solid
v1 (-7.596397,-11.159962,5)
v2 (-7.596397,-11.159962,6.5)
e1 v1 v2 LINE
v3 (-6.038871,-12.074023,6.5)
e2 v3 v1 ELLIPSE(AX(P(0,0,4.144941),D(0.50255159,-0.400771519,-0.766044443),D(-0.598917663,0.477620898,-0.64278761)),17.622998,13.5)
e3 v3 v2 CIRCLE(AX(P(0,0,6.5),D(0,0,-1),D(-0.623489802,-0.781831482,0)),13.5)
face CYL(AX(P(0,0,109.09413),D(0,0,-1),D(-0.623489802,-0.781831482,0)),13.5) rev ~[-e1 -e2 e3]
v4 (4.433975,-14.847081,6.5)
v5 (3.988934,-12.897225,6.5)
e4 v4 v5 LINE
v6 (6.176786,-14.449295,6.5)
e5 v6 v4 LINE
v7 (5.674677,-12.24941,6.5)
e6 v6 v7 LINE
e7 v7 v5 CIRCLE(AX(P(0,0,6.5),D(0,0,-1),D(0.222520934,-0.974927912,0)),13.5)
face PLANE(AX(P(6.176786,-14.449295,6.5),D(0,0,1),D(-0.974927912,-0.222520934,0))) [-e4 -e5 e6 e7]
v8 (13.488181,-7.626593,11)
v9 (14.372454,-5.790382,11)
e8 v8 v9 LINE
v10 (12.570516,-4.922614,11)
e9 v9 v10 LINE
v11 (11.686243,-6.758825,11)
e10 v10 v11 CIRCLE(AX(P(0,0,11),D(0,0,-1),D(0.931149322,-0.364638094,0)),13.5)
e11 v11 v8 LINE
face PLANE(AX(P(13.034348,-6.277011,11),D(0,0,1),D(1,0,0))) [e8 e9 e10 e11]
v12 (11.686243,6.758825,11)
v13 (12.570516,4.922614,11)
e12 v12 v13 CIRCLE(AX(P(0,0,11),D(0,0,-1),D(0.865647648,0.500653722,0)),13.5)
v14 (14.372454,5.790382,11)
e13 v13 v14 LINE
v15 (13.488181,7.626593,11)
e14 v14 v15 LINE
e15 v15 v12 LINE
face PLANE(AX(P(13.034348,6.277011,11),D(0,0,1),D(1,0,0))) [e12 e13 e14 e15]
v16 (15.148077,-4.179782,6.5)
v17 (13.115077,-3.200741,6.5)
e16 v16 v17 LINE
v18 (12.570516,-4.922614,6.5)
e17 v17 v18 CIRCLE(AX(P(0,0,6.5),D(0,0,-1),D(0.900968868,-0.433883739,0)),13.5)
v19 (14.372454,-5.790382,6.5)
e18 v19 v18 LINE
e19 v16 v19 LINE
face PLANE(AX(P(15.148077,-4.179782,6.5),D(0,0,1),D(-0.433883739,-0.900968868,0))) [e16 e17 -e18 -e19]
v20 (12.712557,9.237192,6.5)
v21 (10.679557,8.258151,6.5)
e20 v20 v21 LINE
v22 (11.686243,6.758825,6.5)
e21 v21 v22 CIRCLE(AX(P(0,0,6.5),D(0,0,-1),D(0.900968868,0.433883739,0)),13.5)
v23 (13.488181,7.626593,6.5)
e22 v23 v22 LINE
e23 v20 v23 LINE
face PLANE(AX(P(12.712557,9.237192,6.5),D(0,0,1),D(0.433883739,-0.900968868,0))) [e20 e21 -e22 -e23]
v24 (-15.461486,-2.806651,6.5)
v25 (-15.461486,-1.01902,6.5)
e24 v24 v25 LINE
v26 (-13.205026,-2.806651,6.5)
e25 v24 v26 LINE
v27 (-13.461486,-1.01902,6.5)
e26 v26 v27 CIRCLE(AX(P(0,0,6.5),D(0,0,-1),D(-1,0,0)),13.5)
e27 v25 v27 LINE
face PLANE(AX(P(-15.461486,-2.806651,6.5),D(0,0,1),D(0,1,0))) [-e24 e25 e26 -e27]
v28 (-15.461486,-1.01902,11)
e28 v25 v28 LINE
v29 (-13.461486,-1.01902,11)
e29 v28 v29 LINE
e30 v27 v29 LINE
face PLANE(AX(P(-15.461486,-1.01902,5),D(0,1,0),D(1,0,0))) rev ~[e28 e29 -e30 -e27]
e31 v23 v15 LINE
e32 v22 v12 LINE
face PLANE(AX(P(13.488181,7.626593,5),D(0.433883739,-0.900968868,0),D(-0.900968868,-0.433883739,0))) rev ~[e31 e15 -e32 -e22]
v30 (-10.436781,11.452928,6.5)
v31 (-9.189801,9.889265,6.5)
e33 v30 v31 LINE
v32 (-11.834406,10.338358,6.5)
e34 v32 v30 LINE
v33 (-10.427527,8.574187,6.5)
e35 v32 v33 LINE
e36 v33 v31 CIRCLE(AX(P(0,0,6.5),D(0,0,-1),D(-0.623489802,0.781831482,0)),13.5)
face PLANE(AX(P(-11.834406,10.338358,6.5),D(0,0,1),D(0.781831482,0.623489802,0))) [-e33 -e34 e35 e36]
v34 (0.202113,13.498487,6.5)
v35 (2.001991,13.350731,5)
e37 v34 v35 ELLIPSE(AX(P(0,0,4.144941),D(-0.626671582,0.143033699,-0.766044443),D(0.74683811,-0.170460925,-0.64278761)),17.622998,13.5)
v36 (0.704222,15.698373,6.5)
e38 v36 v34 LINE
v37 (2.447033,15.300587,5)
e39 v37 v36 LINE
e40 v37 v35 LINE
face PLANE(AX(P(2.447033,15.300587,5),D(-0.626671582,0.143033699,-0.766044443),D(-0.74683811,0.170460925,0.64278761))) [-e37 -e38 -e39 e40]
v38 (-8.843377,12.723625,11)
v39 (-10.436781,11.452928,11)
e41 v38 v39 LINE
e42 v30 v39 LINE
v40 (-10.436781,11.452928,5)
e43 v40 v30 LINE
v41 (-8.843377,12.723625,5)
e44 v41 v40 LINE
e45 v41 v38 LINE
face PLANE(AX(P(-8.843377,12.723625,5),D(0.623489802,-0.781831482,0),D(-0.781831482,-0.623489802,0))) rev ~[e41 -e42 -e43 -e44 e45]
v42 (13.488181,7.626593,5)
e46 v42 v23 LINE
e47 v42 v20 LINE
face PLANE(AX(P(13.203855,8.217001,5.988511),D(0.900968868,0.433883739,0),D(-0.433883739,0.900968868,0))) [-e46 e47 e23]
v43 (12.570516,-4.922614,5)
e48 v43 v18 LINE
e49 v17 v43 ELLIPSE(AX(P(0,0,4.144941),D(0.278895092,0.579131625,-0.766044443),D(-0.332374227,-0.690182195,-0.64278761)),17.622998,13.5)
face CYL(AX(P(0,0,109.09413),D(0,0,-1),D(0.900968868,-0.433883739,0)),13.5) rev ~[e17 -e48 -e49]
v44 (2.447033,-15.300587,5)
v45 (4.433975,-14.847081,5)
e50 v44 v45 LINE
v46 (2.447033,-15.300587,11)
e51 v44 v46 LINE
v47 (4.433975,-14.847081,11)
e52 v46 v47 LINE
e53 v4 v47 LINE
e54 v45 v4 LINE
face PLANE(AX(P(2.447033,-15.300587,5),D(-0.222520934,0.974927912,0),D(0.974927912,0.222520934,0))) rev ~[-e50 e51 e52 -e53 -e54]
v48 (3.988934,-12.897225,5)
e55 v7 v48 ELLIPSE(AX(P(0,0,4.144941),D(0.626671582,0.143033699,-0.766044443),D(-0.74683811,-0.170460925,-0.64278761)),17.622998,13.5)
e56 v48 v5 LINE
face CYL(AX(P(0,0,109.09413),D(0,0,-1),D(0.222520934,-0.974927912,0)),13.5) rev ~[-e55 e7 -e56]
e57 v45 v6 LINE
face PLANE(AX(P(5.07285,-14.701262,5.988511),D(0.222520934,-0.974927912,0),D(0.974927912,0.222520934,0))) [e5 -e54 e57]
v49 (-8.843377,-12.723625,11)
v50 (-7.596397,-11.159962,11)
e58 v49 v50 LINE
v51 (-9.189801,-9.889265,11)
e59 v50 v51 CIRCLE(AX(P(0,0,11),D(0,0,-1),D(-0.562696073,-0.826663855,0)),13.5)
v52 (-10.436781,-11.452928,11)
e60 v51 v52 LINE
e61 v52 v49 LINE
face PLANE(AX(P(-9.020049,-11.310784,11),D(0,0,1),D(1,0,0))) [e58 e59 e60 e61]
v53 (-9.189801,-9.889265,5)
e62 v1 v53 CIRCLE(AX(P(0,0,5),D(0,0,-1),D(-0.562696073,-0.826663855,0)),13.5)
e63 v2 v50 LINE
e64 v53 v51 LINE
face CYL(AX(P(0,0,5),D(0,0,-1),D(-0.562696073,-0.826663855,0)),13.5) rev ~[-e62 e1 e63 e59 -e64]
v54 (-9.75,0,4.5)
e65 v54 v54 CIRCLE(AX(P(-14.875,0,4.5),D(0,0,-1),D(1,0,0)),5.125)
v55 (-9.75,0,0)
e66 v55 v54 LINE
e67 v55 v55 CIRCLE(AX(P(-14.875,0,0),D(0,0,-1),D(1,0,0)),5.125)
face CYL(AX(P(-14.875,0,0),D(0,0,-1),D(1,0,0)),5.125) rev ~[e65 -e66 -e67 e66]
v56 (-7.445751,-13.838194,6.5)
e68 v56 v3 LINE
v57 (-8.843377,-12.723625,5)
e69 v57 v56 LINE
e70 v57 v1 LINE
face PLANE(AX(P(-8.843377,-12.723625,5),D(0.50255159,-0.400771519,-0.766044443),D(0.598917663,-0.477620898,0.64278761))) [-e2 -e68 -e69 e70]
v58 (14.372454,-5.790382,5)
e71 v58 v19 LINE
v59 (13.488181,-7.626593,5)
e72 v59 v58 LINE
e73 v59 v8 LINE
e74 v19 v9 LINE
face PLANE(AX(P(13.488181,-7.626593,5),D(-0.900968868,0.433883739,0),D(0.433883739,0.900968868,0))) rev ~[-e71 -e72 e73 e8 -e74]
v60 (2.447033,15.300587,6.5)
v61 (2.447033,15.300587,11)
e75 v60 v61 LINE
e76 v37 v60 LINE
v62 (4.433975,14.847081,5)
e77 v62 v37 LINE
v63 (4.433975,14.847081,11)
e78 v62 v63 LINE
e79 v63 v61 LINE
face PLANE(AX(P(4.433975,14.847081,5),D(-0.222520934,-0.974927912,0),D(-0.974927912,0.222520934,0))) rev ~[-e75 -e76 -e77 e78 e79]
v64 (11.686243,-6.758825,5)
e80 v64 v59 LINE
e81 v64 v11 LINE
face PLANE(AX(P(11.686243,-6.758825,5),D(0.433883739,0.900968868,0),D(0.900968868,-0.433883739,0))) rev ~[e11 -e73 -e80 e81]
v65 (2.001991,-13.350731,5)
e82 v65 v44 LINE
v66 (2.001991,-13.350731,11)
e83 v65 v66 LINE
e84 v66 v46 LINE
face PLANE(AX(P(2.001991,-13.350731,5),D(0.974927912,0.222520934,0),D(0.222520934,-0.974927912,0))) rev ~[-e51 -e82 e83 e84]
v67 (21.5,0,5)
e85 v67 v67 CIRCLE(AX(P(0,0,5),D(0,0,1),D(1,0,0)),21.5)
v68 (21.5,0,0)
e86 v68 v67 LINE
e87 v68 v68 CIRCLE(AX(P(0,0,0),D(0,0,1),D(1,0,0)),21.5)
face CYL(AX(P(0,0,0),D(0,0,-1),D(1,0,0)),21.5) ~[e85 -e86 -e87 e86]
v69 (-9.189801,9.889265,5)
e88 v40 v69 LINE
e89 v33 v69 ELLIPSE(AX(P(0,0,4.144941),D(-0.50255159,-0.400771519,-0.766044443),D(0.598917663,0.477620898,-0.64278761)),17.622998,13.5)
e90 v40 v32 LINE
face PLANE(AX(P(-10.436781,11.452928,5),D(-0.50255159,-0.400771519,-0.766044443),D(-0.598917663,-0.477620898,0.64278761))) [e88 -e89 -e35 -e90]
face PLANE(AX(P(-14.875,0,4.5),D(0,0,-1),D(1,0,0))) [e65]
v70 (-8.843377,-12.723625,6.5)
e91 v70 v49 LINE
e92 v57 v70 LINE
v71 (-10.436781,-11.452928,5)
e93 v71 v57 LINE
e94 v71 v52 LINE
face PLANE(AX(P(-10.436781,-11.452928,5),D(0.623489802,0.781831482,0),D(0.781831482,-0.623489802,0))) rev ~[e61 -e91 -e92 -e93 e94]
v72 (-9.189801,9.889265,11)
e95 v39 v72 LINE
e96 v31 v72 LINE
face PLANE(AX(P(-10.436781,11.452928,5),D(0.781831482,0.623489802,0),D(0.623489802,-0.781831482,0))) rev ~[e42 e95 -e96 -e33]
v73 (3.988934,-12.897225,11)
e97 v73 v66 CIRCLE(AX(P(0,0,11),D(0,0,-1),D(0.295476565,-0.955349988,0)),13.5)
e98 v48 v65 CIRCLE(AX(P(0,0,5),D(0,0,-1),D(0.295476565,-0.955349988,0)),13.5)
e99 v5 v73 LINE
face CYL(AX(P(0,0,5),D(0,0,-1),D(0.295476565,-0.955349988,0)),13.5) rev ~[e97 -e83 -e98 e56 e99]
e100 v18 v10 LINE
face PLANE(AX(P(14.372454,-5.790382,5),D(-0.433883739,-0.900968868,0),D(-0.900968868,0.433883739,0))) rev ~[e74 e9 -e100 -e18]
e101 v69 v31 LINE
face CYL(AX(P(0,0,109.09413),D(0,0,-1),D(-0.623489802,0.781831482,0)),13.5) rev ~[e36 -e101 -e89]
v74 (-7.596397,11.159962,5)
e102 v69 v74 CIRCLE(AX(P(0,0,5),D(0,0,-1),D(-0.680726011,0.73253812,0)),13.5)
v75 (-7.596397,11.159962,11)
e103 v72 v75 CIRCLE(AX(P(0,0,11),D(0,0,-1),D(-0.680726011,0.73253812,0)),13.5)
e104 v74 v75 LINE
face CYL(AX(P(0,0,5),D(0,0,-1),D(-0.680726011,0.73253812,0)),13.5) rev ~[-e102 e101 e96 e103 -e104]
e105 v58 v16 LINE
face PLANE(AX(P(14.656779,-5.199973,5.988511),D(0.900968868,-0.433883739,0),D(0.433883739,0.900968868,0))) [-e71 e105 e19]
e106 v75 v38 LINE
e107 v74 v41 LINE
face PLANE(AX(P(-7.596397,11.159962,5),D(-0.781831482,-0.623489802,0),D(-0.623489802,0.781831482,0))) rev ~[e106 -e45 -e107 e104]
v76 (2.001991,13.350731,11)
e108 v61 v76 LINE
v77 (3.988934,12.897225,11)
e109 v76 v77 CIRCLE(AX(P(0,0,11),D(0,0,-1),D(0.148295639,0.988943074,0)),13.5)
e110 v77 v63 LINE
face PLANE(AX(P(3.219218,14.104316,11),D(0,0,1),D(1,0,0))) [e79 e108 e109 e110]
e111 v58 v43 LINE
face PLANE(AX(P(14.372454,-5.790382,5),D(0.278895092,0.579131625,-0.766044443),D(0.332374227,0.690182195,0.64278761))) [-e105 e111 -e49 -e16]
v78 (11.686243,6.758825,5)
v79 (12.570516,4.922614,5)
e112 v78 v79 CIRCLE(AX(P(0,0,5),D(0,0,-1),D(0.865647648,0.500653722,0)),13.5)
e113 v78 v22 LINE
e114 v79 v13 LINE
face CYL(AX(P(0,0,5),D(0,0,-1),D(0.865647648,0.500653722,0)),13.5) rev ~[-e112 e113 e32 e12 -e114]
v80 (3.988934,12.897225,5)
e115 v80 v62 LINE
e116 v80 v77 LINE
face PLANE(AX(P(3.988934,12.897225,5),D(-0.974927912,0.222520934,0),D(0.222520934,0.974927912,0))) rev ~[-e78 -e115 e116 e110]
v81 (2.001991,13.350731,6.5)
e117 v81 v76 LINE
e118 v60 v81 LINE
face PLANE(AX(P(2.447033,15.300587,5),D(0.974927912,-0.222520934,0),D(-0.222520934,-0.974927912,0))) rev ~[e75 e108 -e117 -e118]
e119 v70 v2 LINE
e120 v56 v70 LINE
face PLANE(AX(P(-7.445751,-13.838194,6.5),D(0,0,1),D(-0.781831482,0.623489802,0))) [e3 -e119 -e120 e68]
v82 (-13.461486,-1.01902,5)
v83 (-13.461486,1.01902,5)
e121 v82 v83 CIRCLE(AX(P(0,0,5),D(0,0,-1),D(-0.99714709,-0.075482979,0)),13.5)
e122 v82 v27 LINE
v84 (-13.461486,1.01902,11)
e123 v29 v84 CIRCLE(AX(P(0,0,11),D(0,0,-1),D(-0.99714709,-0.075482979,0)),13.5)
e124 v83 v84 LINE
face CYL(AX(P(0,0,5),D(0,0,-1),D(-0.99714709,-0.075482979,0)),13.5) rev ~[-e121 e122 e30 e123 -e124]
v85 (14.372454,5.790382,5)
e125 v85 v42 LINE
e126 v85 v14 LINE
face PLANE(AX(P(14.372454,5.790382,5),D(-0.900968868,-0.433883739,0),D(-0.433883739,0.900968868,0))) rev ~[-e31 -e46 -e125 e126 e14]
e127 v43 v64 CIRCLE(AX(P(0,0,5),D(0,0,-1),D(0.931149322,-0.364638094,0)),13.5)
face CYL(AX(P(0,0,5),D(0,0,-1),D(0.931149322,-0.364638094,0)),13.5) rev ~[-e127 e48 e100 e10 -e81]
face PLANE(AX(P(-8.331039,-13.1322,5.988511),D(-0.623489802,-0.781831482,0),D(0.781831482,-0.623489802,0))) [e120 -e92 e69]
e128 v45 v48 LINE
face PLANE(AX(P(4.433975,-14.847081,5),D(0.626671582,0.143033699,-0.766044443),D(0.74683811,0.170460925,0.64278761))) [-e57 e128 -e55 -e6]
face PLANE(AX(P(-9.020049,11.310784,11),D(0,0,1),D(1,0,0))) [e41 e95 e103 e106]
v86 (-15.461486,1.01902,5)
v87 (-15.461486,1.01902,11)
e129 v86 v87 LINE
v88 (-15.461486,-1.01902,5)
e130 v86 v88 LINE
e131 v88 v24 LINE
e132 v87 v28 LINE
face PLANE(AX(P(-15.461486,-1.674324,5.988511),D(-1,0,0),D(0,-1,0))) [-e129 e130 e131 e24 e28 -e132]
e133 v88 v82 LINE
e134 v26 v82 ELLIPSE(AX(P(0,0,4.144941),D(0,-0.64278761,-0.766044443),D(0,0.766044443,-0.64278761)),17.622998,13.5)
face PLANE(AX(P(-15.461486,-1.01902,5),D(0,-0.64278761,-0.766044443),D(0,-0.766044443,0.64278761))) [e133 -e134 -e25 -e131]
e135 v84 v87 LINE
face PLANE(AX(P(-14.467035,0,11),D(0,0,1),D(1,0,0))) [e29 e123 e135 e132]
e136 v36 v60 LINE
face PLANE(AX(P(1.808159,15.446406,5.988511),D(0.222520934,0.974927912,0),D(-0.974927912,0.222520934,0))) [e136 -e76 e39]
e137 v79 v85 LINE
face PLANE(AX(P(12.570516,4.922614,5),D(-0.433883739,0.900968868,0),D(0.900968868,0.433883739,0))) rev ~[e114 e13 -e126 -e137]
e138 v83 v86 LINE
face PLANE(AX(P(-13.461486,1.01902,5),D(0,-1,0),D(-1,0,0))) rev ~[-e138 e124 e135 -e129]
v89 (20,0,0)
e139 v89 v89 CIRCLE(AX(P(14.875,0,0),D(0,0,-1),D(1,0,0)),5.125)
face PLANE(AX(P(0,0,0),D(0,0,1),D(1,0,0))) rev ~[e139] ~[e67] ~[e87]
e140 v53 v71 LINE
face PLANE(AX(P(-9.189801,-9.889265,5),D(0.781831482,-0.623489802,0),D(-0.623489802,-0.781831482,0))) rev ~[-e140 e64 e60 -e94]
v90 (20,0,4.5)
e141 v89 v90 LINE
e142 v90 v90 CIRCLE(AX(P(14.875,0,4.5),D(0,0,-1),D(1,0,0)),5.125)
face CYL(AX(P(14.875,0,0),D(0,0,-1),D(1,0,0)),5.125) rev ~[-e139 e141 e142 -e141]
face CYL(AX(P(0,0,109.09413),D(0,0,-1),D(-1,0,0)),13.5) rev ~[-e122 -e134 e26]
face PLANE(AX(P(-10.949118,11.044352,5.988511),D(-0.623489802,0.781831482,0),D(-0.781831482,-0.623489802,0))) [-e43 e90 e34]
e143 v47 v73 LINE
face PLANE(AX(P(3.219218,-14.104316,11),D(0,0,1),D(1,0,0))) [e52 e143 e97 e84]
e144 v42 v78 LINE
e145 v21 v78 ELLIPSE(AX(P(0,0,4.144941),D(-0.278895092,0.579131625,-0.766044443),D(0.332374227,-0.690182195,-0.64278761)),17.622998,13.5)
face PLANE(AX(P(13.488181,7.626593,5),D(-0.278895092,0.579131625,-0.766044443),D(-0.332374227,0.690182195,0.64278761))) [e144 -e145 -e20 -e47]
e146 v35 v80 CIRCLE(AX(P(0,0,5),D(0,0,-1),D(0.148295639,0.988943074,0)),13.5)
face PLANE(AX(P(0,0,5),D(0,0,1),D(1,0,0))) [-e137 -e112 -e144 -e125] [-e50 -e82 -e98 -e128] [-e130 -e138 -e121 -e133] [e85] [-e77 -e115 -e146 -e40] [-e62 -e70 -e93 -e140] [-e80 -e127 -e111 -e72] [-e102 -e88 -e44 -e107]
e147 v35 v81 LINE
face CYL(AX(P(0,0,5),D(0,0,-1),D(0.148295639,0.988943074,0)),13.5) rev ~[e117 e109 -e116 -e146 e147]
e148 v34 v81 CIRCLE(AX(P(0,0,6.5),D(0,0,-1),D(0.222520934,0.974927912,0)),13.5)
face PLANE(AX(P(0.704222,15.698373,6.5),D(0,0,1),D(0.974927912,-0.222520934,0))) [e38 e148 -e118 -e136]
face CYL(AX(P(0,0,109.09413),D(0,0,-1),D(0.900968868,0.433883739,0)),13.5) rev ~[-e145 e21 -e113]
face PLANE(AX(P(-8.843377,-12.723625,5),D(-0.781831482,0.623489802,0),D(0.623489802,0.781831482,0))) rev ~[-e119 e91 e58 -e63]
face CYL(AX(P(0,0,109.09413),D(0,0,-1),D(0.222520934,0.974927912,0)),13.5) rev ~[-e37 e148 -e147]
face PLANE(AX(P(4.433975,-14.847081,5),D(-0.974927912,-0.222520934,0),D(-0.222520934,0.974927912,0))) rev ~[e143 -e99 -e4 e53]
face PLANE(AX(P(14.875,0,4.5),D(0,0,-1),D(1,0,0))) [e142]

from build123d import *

# Parameters (mm, degrees)
F0_R            = 21.5
F0_R_2          = 13.5
F1_DEPTH        = 5
F3_DEPTH        = 6
F4_R            = 5.125
F5_DEPTH        = 4.5
F7_END_RADIUS   = 13.5
F7_REACH        = 39.2960714607
F7_COPIES_COUNT = 7


# Not quite as in the source:
# - a pattern or mirror of a feature is missing from the dataset's text; its kind, count and spacing are read off the source's solid


with BuildPart() as f1:
    # F0 (on Top) → F1 (new body)
    with BuildSketch(Plane.XY):
        Circle(F0_R)
        Circle(F0_R_2, mode=Mode.SUBTRACT)
        Circle(F0_R_2)
    extrude(amount=F1_DEPTH)

    # F2 (on face) → F3 (join)
    with BuildSketch(Plane.XY.offset(5)):
        with BuildLine():
            ThreePointArc((-13.4614857204, -1.0190202158), (-13.5, 0), (-13.4614857204, 1.0190202158))
            Line((-13.4614857204, 1.0190202158), (-15.4614857204, 1.0190202158))
            Line((-15.4614857204, 1.0190202158), (-15.4614857204, -1.0190202158))
            Line((-15.4614857204, -1.0190202158), (-13.4614857204, -1.0190202158))
        make_face()
        with BuildLine():
            ThreePointArc((-7.5963969786, -11.1599620494), (-8.4171123251, -10.5547250133), (-9.1898011505, -9.8892646246))
            Line((-9.1898011505, -9.8892646246), (-10.4367807542, -11.4529275895))
            Line((-10.4367807542, -11.4529275895), (-8.8433765823, -12.7236250143))
            Line((-8.8433765823, -12.7236250143), (-7.5963969786, -11.1599620494))
        make_face()
        with BuildLine():
            ThreePointArc((3.9889336264, -12.8972248381), (3.0040326084, -13.1615268145), (2.0019911235, -13.3507314984))
            Line((2.0019911235, -13.3507314984), (2.4470329914, -15.3005873227))
            Line((2.4470329914, -15.3005873227), (4.4339754943, -14.8470806625))
            Line((4.4339754943, -14.8470806625), (3.9889336264, -12.8972248381))
        make_face()
        with BuildLine():
            ThreePointArc((12.5705158512, -4.9226142683), (12.1630797167, -5.8574304781), (11.6862432483, -6.7588252486))
            Line((11.6862432483, -6.7588252486), (13.4881809841, -7.6265927268))
            Line((13.4881809841, -7.6265927268), (14.372453587, -5.7903817465))
            Line((14.372453587, -5.7903817465), (12.5705158512, -4.9226142683))
        make_face()
        with BuildLine():
            ThreePointArc((11.6862432483, 6.7588252486), (12.1630797167, 5.8574304781), (12.5705158512, 4.9226142683))
            Line((12.5705158512, 4.9226142683), (14.372453587, 5.7903817465))
            Line((14.372453587, 5.7903817465), (13.4881809841, 7.6265927268))
            Line((13.4881809841, 7.6265927268), (11.6862432483, 6.7588252486))
        make_face()
        with BuildLine():
            ThreePointArc((2.0019911235, 13.3507314984), (3.0040326084, 13.1615268145), (3.9889336264, 12.8972248381))
            Line((3.9889336264, 12.8972248381), (4.4339754943, 14.8470806625))
            Line((4.4339754943, 14.8470806625), (2.4470329914, 15.3005873227))
            Line((2.4470329914, 15.3005873227), (2.0019911235, 13.3507314984))
        make_face()
        with BuildLine():
            ThreePointArc((-9.1898011505, 9.8892646246), (-8.4171123251, 10.5547250133), (-7.5963969786, 11.1599620494))
            Line((-7.5963969786, 11.1599620494), (-8.8433765823, 12.7236250143))
            Line((-8.8433765823, 12.7236250143), (-10.4367807542, 11.4529275895))
            Line((-10.4367807542, 11.4529275895), (-9.1898011505, 9.8892646246))
        make_face()
    extrude(amount=F3_DEPTH)

    # F4 (on face) → F5 (cut)
    with BuildSketch(Plane(origin=(0, 0, 0), x_dir=(1, 0, 0), z_dir=(0, 0, -1))):
        with Locations((-14.875, 0)):
            Circle(F4_R)
        with Locations((14.875, 0)):
            Circle(F4_R)
    extrude(amount=-F5_DEPTH, mode=Mode.SUBTRACT)

    f7_end = (Plane(origin=(0, 0, 8), x_dir=(-1, 0, 0), z_dir=(0, 0, -1)) * Cylinder(F7_END_RADIUS, 202.1882593652, mode=Mode.PRIVATE)).faces().sort_by_distance((-13.5, 0, 8))[0]
    # F6 (on face) → F7 (join, up to the whole of a round face its end follows)
    with BuildSketch(Plane(origin=(-15.4614857204, 0, 0), x_dir=(0, -1, 0), z_dir=(-1, 0, 0))):
        Polygon((1.0190202158, 6.5), (1.0190202158, 5), (2.8066506047, 6.5), align=None)
    f7_long = extrude(amount=-F7_REACH, mode=Mode.PRIVATE)
    f7 = split(f7_long, bisect_by=f7_end, keep=Keep.ALL, mode=Mode.PRIVATE).solids().sort_by_distance((-15.4614857204, -1.6148970121, 6))[0]
    add(f7)

    # F7_copies: F7 ×7 about axis
    f7_copies_axis = Axis((0, 0, 0), (0, 0, 1))
    for i in range(1, F7_COPIES_COUNT):
        add(f7.rotate(f7_copies_axis, i * 360 / F7_COPIES_COUNT))


solid = f1.part
